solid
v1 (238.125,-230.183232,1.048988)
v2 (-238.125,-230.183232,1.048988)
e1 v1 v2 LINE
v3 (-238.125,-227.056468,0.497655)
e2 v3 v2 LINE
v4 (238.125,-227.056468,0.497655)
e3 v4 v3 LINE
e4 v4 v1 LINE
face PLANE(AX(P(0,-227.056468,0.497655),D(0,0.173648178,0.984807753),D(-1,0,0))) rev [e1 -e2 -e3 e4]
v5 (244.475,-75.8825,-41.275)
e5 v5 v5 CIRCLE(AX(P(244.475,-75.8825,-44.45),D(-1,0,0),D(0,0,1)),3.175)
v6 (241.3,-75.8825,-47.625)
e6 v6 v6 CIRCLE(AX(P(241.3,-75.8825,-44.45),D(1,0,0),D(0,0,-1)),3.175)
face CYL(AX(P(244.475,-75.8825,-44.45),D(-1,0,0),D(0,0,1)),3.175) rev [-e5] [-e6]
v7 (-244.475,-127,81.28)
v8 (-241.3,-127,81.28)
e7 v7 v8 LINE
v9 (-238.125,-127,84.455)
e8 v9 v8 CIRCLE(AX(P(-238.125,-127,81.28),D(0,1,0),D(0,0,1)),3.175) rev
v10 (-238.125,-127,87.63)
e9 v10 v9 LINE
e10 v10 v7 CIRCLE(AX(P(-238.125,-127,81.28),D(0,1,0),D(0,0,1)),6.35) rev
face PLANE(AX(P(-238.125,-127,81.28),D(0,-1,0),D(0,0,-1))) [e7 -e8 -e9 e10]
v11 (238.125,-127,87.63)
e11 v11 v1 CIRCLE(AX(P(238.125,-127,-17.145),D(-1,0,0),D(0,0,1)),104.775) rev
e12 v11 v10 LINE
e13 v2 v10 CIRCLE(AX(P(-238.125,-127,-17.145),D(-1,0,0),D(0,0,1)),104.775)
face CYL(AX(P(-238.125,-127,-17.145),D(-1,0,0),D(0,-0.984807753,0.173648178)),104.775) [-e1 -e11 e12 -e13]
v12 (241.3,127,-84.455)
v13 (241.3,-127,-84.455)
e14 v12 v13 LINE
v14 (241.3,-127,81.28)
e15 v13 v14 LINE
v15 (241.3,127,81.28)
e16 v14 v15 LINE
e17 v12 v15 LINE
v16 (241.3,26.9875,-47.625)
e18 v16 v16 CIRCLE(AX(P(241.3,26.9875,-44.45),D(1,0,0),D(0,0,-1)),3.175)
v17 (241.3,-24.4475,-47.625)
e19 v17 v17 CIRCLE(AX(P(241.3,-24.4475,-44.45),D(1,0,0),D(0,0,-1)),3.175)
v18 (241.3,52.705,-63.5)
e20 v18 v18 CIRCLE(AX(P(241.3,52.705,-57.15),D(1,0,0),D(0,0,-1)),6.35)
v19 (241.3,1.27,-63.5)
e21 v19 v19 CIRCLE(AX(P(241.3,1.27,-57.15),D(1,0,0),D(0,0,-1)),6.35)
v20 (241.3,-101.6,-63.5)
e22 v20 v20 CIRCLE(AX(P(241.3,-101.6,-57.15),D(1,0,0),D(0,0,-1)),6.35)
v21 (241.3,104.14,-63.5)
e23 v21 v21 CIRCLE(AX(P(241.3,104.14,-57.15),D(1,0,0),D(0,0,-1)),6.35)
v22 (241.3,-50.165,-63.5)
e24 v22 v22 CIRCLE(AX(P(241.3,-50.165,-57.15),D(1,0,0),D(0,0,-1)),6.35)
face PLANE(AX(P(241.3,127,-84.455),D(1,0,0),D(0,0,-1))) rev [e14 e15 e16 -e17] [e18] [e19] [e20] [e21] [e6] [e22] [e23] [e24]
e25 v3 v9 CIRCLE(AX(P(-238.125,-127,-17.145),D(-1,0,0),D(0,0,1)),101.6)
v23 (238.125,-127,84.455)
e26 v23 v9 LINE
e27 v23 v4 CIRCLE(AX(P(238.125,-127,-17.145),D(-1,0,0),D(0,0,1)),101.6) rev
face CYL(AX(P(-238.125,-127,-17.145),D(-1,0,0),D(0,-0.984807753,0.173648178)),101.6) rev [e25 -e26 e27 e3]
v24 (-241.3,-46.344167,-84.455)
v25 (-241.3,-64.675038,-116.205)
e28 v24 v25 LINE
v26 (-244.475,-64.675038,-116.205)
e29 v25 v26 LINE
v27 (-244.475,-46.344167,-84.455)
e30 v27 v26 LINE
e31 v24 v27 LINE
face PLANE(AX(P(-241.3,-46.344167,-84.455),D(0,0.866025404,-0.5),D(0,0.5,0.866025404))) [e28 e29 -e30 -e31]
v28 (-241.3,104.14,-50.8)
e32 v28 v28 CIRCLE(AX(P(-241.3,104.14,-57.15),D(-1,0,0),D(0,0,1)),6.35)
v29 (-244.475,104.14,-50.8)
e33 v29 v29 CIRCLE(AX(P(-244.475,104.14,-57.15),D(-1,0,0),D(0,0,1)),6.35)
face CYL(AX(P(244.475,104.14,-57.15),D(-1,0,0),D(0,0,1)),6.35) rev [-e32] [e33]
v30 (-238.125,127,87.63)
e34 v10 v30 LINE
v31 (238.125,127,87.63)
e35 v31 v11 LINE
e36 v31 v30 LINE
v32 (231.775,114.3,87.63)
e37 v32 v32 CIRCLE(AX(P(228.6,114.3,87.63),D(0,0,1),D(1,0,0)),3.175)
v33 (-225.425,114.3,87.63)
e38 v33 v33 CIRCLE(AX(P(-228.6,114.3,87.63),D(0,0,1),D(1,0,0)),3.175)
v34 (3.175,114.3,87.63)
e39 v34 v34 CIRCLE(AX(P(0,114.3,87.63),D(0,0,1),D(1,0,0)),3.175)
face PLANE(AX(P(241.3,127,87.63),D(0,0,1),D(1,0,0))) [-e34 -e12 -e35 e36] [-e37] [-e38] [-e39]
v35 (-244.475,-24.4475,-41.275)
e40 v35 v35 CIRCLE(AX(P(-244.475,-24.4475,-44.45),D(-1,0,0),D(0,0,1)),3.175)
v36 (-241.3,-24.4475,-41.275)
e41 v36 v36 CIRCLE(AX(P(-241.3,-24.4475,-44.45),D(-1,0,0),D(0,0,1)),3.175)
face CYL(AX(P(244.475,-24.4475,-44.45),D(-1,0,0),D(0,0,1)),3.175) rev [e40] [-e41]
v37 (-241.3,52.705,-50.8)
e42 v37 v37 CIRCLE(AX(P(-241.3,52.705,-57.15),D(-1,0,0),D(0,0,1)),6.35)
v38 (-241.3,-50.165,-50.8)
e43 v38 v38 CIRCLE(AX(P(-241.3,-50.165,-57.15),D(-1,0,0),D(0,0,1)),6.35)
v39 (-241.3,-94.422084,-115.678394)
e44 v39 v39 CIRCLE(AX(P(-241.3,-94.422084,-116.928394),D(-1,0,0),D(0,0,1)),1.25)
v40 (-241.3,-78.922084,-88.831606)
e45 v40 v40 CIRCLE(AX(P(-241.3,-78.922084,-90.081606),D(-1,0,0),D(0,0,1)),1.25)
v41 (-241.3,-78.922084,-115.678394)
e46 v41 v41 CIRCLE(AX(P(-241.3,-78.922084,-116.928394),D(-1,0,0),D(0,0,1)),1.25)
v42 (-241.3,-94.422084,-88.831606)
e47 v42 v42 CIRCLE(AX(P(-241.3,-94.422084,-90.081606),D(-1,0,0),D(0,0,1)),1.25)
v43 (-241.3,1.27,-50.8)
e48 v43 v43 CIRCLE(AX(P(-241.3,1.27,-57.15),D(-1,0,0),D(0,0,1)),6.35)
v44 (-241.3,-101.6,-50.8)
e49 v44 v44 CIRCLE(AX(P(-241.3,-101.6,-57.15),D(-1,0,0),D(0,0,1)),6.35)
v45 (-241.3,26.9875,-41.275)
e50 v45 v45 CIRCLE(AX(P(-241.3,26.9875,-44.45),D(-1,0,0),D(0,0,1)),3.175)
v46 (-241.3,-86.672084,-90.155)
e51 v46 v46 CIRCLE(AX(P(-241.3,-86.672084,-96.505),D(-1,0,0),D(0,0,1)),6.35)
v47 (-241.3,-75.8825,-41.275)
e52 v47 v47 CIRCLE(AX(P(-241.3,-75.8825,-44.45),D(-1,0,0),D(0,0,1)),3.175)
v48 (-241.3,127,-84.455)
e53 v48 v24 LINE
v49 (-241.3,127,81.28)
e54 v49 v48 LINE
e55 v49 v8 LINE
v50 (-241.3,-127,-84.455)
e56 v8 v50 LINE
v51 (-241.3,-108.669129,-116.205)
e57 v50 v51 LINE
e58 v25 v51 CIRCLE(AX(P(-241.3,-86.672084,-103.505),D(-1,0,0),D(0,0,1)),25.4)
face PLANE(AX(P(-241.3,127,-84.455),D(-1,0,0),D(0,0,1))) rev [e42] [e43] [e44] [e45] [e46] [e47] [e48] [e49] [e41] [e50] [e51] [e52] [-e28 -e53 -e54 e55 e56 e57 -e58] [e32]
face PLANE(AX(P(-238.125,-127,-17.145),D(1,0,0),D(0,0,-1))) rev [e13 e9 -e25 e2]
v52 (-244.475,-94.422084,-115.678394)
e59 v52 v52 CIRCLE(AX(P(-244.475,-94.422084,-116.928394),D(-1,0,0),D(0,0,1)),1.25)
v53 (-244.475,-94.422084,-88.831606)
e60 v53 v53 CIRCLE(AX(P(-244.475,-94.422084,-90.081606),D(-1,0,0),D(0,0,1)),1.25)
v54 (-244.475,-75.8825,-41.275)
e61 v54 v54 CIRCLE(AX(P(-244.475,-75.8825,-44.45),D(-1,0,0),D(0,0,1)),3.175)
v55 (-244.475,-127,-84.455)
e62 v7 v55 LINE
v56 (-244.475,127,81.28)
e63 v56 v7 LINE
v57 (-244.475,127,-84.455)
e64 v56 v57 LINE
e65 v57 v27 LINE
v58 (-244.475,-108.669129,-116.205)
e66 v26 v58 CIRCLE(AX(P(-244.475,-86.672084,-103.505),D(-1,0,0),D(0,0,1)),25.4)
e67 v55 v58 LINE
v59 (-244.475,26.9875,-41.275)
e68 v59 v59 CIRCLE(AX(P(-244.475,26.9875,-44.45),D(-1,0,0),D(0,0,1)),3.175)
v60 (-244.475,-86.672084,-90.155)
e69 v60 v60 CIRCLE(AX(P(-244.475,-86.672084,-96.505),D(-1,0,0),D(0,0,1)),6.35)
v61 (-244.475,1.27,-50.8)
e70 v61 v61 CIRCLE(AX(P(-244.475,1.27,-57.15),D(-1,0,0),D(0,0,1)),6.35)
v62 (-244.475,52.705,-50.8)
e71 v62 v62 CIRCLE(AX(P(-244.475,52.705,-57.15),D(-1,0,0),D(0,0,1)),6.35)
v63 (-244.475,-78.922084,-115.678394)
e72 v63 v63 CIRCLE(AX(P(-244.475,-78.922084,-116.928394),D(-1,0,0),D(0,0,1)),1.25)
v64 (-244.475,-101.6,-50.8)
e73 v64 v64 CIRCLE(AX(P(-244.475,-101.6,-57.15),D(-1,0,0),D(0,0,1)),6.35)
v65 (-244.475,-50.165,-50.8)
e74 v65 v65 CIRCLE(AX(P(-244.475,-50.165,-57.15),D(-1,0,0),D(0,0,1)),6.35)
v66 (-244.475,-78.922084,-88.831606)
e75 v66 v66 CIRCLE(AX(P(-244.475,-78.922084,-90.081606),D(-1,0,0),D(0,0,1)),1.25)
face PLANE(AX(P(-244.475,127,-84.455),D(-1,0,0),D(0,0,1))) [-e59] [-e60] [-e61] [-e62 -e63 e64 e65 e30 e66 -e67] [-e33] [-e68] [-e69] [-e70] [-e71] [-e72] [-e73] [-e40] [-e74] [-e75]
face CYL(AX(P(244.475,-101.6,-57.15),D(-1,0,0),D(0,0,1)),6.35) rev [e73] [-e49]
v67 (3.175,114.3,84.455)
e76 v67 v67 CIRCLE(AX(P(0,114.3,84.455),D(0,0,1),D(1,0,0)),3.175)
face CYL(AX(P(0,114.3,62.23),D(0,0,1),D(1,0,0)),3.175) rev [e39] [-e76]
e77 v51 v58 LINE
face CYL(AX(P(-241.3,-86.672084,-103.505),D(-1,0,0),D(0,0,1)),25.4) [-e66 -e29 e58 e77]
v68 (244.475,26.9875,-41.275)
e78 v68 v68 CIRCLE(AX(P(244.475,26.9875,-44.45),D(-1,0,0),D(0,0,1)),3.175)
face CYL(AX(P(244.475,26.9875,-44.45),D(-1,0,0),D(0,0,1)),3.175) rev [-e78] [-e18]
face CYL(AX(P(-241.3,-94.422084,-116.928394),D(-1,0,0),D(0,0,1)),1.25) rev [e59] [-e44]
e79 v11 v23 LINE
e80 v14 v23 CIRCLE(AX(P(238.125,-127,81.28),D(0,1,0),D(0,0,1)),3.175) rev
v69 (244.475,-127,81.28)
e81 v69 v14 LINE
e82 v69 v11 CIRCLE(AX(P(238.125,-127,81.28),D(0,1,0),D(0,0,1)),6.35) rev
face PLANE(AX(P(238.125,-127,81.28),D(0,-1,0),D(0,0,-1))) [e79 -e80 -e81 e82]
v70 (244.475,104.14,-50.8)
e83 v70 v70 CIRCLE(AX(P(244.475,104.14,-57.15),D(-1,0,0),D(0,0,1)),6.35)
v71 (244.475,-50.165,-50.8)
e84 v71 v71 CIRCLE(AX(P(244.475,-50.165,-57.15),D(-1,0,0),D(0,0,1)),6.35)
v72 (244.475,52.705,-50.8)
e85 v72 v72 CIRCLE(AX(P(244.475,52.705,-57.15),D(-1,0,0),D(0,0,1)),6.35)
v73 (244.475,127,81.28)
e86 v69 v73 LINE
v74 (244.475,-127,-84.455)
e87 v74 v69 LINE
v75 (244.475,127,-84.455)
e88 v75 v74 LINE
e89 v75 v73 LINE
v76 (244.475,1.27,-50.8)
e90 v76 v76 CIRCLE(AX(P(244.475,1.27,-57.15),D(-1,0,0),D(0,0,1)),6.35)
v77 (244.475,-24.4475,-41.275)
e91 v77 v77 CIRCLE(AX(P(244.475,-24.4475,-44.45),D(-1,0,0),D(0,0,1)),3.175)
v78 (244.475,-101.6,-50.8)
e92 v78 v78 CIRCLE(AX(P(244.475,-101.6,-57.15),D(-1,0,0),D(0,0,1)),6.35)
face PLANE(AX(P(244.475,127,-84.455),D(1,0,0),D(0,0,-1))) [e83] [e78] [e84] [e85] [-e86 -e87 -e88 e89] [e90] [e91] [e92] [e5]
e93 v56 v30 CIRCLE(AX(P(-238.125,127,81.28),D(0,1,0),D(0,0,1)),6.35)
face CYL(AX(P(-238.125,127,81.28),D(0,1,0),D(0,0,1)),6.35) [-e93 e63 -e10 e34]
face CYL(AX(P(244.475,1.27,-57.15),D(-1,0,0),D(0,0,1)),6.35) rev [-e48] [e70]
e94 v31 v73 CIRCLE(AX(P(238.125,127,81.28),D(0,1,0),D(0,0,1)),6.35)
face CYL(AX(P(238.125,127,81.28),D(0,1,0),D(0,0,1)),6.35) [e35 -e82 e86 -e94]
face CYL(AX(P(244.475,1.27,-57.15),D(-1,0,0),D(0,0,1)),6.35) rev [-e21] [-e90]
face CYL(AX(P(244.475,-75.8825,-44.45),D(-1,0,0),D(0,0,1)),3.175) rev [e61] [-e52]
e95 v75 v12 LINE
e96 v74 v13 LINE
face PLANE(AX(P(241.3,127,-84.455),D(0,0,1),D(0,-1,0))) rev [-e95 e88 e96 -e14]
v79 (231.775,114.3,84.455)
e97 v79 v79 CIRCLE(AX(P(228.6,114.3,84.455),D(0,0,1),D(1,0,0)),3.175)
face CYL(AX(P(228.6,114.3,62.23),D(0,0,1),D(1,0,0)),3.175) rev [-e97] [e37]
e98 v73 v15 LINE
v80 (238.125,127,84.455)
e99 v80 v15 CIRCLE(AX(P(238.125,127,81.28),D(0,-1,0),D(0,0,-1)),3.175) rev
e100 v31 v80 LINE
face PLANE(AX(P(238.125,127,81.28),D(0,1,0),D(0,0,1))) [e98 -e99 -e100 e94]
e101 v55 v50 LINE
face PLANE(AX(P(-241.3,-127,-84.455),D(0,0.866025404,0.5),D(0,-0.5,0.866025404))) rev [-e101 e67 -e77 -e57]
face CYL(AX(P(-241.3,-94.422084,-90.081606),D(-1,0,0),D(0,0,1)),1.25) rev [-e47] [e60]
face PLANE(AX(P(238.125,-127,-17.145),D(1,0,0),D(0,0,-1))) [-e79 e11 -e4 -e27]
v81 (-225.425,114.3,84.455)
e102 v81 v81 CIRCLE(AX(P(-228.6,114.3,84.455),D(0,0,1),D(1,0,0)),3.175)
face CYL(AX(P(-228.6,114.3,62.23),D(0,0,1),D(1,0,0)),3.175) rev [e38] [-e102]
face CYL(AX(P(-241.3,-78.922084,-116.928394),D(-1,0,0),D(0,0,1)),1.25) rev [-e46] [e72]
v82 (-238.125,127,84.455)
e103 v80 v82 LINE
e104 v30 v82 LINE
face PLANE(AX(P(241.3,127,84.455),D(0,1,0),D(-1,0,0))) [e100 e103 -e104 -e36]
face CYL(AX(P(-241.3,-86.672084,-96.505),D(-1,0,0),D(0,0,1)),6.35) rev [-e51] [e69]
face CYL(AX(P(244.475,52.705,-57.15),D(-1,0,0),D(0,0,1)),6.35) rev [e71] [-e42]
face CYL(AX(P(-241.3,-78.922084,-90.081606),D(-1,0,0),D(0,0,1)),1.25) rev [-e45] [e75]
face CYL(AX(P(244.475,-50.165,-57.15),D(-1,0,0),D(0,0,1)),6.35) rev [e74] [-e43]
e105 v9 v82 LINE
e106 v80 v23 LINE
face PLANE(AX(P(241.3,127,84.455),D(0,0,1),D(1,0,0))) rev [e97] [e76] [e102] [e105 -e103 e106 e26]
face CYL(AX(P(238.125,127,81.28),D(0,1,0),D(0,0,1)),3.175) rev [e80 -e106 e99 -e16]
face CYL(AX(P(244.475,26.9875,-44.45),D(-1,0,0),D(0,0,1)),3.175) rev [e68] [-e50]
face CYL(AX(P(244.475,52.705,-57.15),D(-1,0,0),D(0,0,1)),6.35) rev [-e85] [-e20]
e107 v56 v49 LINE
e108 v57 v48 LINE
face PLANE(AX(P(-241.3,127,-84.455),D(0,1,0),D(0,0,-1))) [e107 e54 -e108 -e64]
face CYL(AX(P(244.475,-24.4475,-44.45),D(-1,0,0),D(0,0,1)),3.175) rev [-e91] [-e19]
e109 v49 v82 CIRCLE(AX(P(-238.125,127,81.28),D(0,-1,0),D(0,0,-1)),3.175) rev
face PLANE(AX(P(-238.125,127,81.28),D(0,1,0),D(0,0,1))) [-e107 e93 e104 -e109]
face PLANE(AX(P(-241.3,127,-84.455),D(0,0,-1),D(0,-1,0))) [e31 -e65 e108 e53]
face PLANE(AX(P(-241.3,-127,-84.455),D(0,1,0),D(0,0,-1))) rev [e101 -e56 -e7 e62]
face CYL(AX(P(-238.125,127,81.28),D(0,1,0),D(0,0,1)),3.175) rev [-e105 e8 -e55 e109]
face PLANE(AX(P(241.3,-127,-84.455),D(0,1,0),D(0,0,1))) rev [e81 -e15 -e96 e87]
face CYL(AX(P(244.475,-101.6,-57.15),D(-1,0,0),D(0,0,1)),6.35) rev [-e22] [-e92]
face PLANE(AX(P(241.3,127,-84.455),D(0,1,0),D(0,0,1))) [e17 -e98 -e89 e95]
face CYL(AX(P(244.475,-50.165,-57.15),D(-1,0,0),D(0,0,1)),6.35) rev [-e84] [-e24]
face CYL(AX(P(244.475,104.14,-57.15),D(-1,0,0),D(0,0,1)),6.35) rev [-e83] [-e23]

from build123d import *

# Parameters (mm, degrees)
BOSS_EXTRUDE2_DEPTH    = 127
CONVERT_SOLID1_START   = -127
CONVERT_SOLID1_DEPTH   = 254
CONVERT_SOLID1_2_DEPTH = 254
SKETCH7_R              = 6.35
SKETCH7_R_2            = 3.175
CUT_EXTRUDE1_DEPTH     = 513.718362651
SKETCH8_R              = 3.175
CUT_EXTRUDE2_DEPTH     = 25.4
BOSS_EXTRUDE3_DEPTH    = 3.175
SKETCH10_R             = 6.35
SKETCH10_R_2           = 1.25
CUT_EXTRUDE3_DEPTH     = 3.175
HEM1_START             = -238.125
HEM1_DEPTH             = 476.25


# Read off the part's stored shape, not the designer's step: Convert-Solid1, Hem1
with BuildPart() as part:
    # Sketch1 → Boss-Extrude2 (new, symmetric)
    with BuildSketch(Plane(origin=(0, 0, 0), x_dir=(1, 0, 0), z_dir=(0, 1, 0))):
        Polygon((-244.475, 84.455), (-241.3, 84.455), (-241.3, -84.455), (241.3, -84.455), (241.3, 84.455), (244.475, 87.63), (244.475, -87.63), (-244.475, -87.63), align=None)
    extrude(amount=BOSS_EXTRUDE2_DEPTH, both=True)

    # Convert-Solid1 outline → Convert-Solid1 (cut)
    with BuildSketch(Plane(origin=(0, 0, 0), x_dir=(1, 0, 0), z_dir=(0, 1, 0)).offset(CONVERT_SOLID1_START)):
        Polygon((244.475, 87.63), (241.3, 84.455), (244.475, 84.455), align=None)
        with BuildLine():
            Line((-244.475, -87.63), (-238.125, -87.63))
            ThreePointArc((-238.125, -87.63), (-242.615128061, -85.770128061), (-244.475, -81.28))
            Line((-244.475, -81.28), (-244.475, -87.63))
        make_face()
        with BuildLine():
            Line((244.475, -87.63), (244.475, -81.28))
            ThreePointArc((244.475, -81.28), (242.615128061, -85.770128061), (238.125, -87.63))
            Line((238.125, -87.63), (244.475, -87.63))
        make_face()
    extrude(amount=CONVERT_SOLID1_DEPTH, mode=Mode.SUBTRACT)

    # Convert-Solid1 2 outline → Convert-Solid1 2 (add)
    with BuildSketch(Plane(origin=(0, 0, 0), x_dir=(1, 0, 0), z_dir=(0, 1, 0)).offset(CONVERT_SOLID1_START)):
        with BuildLine():
            Line((-241.3, -84.455), (-238.125, -84.455))
            ThreePointArc((-238.125, -84.455), (-240.37006403, -83.52506403), (-241.3, -81.28))
            Line((-241.3, -81.28), (-241.3, -84.455))
        make_face()
        with BuildLine():
            Line((241.3, -84.455), (241.3, -81.28))
            ThreePointArc((241.3, -81.28), (240.37006403, -83.52506403), (238.125, -84.455))
            Line((238.125, -84.455), (241.3, -84.455))
        make_face()
    extrude(amount=CONVERT_SOLID1_2_DEPTH)

    # Sketch7 → Cut-Extrude1 (cut, through all)
    with BuildSketch(Plane.ZY.offset(244.475)):
        with Locations((-57.15, 155.575)):
            Circle(SKETCH7_R)
        with Locations((-57.15, 104.14)):
            Circle(SKETCH7_R)
        with Locations((-57.15, 52.705)):
            Circle(SKETCH7_R)
        with Locations((-57.15, 1.27)):
            Circle(SKETCH7_R)
        with Locations((-57.15, -50.165)):
            Circle(SKETCH7_R)
        with Locations((-57.15, 207.01)):
            Circle(SKETCH7_R)
        with Locations((-57.15, -101.6)):
            Circle(SKETCH7_R)
        with Locations((-44.45, -24.4475)):
            Circle(SKETCH7_R_2)
        with Locations((-44.45, 26.9875)):
            Circle(SKETCH7_R_2)
        with Locations((-44.45, -75.8825)):
            Circle(SKETCH7_R_2)
    extrude(amount=-CUT_EXTRUDE1_DEPTH, mode=Mode.SUBTRACT)

    # Sketch8 → Cut-Extrude2 (cut)
    with BuildSketch(Plane.XY.offset(87.63)):
        with Locations((0, 114.3)):
            Circle(SKETCH8_R)
        with Locations((228.6, 114.3)):
            Circle(SKETCH8_R)
        with Locations((-228.6, 114.3)):
            Circle(SKETCH8_R)
    extrude(amount=-CUT_EXTRUDE2_DEPTH, mode=Mode.SUBTRACT)

    # Sketch9 → Boss-Extrude3 (add)
    with BuildSketch(Plane.ZY.offset(244.475)):
        with BuildLine():
            Line((-84.455, -46.344167394), (-116.205, -64.675038441))
            ThreePointArc((-116.205, -64.675038441), (-128.905, -86.672083697), (-116.205, -108.669128953))
            Line((-116.205, -108.669128953), (-84.455, -127))
            Line((-84.455, -127), (-84.455, -46.344167394))
        make_face()
    extrude(amount=-BOSS_EXTRUDE3_DEPTH)

    # Sketch10 → Cut-Extrude3 (cut)
    with BuildSketch(Plane.ZY.offset(244.475)):
        with Locations((-96.505, -86.672083697)):
            Circle(SKETCH10_R)
        with Locations((-90.081606241, -94.422083697)):
            Circle(SKETCH10_R_2)
        with Locations((-116.928393759, -94.422083697)):
            Circle(SKETCH10_R_2)
        with Locations((-116.928393759, -78.922083697)):
            Circle(SKETCH10_R_2)
        with Locations((-90.081606241, -78.922083697)):
            Circle(SKETCH10_R_2)
    extrude(amount=-CUT_EXTRUDE3_DEPTH, mode=Mode.SUBTRACT)

    # Hem1 outline → Hem1 (add)
    with BuildSketch(Plane.YZ.offset(HEM1_START)):
        with BuildLine():
            Line((-230.183232322, 1.048987815), (-227.056467706, 0.497654851))
            ThreePointArc((-227.056467706, 0.497654851), (-192.307221144, 60.685115421), (-127, 84.455))
            Line((-127, 84.455), (-127, 87.63))
            ThreePointArc((-127, 87.63), (-194.348071805, 63.117306528), (-230.183232322, 1.048987815))
        make_face()
    extrude(amount=HEM1_DEPTH)


solid = part.part
